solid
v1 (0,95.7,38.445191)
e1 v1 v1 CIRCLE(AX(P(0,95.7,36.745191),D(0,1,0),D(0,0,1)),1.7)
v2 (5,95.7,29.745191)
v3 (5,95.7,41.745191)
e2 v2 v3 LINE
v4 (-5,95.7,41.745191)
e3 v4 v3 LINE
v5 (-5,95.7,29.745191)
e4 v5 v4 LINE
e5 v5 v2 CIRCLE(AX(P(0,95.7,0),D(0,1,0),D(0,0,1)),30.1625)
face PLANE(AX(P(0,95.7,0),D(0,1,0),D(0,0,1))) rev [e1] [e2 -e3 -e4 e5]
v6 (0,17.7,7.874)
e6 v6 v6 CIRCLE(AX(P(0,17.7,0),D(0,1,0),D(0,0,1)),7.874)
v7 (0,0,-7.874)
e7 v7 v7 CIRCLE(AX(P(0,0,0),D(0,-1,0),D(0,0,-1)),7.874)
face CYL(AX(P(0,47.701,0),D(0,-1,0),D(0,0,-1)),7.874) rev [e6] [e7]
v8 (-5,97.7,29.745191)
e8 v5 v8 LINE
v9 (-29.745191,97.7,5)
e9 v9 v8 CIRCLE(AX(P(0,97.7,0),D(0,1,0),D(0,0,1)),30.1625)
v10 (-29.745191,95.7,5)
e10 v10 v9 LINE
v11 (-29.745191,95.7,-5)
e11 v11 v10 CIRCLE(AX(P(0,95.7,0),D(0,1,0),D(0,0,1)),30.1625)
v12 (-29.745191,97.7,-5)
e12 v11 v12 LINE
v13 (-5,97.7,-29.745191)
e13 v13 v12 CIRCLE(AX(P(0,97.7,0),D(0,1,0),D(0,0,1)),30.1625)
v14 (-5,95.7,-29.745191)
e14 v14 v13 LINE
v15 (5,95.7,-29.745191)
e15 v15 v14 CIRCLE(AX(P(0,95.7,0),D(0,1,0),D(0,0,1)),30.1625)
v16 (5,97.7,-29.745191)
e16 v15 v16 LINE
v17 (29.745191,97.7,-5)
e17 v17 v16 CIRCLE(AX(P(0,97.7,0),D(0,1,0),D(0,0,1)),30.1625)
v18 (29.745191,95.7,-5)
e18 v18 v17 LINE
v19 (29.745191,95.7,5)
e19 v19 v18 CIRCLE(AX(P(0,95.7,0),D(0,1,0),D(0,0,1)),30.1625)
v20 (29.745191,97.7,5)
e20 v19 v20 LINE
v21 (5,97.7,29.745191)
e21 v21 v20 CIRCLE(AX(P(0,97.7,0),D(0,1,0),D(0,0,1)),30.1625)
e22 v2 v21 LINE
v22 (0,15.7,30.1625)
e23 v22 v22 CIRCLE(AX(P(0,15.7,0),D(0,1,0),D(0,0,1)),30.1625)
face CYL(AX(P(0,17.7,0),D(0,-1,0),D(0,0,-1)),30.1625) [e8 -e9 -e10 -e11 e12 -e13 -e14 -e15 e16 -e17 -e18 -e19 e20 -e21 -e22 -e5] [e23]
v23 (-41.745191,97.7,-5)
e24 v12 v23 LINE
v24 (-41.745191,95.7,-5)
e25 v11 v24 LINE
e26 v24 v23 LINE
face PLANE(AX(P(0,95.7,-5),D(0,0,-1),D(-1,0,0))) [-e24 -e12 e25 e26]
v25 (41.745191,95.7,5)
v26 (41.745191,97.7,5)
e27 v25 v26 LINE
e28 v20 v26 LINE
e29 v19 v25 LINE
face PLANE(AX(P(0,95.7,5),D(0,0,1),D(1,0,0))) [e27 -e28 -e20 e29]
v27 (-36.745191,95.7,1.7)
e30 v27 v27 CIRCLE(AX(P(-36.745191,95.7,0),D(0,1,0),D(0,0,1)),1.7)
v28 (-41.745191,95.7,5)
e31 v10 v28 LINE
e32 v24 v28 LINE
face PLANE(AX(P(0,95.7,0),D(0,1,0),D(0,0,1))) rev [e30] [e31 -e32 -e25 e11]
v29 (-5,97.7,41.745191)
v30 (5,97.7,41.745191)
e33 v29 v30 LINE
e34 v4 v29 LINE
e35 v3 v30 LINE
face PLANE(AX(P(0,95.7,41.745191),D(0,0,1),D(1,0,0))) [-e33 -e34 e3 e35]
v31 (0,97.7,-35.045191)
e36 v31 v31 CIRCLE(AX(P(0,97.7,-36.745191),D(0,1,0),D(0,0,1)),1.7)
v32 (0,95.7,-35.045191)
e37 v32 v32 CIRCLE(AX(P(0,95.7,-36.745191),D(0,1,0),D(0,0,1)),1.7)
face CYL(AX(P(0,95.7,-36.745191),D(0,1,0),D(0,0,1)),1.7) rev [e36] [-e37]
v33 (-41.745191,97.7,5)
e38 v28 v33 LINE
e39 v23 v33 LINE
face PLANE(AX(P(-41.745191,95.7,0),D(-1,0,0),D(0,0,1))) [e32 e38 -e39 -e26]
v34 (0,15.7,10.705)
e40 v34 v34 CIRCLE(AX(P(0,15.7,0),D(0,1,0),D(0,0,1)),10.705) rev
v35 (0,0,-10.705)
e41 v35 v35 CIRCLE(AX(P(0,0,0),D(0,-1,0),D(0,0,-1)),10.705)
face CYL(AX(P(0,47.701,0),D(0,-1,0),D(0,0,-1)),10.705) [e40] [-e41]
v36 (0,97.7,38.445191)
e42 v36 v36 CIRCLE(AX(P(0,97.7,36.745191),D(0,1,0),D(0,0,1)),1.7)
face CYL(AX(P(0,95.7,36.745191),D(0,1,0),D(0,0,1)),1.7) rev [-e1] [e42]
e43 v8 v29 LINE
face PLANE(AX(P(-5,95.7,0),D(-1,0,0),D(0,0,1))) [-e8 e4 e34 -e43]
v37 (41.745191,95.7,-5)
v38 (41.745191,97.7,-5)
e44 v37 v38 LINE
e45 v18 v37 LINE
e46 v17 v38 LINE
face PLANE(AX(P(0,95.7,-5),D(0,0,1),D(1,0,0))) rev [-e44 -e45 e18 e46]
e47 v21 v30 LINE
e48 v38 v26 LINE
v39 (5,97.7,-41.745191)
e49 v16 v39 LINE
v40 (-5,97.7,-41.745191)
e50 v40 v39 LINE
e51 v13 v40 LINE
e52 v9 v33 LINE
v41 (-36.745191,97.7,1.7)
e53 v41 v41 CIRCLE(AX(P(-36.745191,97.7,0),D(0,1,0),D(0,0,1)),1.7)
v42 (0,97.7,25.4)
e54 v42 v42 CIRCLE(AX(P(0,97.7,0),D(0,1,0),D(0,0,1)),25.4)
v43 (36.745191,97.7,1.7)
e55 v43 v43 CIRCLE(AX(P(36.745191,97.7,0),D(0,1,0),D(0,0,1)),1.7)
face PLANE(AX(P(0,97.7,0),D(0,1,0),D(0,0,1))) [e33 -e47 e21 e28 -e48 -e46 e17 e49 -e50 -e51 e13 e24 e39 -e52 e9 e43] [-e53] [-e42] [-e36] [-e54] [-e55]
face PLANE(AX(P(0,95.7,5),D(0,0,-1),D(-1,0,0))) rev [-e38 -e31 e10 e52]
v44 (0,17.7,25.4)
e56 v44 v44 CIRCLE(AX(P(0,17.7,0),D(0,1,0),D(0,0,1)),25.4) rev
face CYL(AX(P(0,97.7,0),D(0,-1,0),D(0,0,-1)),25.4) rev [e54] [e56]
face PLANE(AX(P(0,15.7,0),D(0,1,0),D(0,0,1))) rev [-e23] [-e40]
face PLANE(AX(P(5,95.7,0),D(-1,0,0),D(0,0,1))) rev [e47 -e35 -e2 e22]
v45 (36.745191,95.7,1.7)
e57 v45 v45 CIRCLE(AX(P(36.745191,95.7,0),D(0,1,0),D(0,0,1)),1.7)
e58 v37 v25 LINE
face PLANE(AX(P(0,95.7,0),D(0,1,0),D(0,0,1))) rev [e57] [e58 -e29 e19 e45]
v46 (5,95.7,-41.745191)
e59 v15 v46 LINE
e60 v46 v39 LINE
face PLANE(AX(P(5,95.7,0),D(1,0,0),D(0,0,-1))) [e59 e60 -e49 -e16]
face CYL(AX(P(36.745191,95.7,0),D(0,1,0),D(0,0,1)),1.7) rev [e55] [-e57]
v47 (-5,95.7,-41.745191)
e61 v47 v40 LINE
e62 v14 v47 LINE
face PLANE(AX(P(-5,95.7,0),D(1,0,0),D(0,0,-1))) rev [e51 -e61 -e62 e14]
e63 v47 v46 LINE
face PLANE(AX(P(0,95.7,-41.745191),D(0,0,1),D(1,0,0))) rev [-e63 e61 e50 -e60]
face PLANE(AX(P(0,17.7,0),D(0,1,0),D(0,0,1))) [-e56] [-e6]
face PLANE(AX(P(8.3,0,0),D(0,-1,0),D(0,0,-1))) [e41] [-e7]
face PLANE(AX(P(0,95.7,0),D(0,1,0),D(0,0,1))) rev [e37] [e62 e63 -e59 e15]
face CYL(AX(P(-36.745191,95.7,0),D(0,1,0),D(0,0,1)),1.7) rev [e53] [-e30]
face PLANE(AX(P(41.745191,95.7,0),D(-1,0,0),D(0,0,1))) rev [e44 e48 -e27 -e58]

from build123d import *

# Parameters (mm, degrees)
SKETCH5_OUTSIDE_W   = 34.468
SKETCH5_OUTSIDE_H   = 34.468
CUT_EXTRUDE1_DEPTH  = 7.2
BOSS_EXTRUDE1_REACH = 51.718
SKETCH10_R          = 10.705
SKETCH10_R_2        = 6.9
BOSS_EXTRUDE3_REACH = 31.655
SKETCH12_R          = 8.3
CUT_EXTRUDE3_REACH  = 53.775
SKETCH13_R          = 3.45
SKETCH14_R          = 23.979548074
CUT_EXTRUDE5_DEPTH  = 32
BOSS_EXTRUDE4_START = 2
SKETCH16_R          = 30.1625
SKETCH16_R_2        = 7.874
BOSS_EXTRUDE4_DEPTH = 2
BOSS_EXTRUDE5_START = 80
SKETCH17_R          = 30.1625
SKETCH17_R_2        = 25.4
BOSS_EXTRUDE5_DEPTH = 80
SKETCH18_R          = 1.7
BOSS_EXTRUDE6_DEPTH = 2


# Read off the part's stored shape, not the designer's step: Cut-Extrude2
with BuildPart() as part:
    # Sketch1 → Revolve1 (revolve)
    with BuildSketch(Plane.XY, mode=Mode.PRIVATE) as revolve1_sk:
        Polygon((3.25, 47.7), (4.8, 47.7), (5.2, 43.217813034), (4.8, 42.533333333), (5.2, 38.051146367), (4.8, 37.366666667), (5.2, 32.8844797), (4.8, 32.2), (5.25, 26.2), (5.25, 22.2), (10.6, 22.2), (10.6, 15), (8.3, 15), (8.3, 0), (5.5, 0), (5.5, 18), (3.25, 19.7), align=None)
    revolve(revolve1_sk.sketch.rotate(Axis((0, 0, 0), (0, 1, 0)), 90), axis=Axis((0, 0, 0), (0, 1, 0)))

    # Sketch5 outside → Cut-Extrude1 (cut)
    with BuildSketch(Plane(origin=(0, 22.2, 0), x_dir=(1, 0, 0), z_dir=(0, 1, 0))):
        Rectangle(SKETCH5_OUTSIDE_W, SKETCH5_OUTSIDE_H)
        Polygon((-5.3, 9.17986928), (5.3, 9.17986928), (10.6, 0), (5.3, -9.17986928), (-5.3, -9.17986928), (-10.6, 0), align=None, mode=Mode.SUBTRACT)
    extrude(amount=-CUT_EXTRUDE1_DEPTH, mode=Mode.SUBTRACT)

    # Sketch4 → Cut-Revolve1 (revolve, cut)
    with BuildSketch(Plane.XY, mode=Mode.PRIVATE) as cut_revolve1_sk:
        Polygon((6.9, 0), (8.3, 1.4), (8.3, 0), align=None)
        Polygon((8.3, 15), (10.6, 15.837131539), (10.6, 15), align=None)
        Polygon((8.3, 22.2), (10.6, 21.362868461), (10.6, 22.2), align=None)
    revolve(cut_revolve1_sk.sketch.rotate(Axis((0, 0, 0), (0, 1, 0)), 90), axis=Axis((0, 0, 0), (0, 1, 0)), mode=Mode.SUBTRACT)

    # Boss-Extrude1: up to this cone (the profile starts outside it)
    boss_extrude1_end = Plane(origin=(0, 0, 0), z_dir=(0, 1, 0)).offset(11.979048056) * Cone(2.747e-06, 110.555614597, 40.238951944, align=(Align.CENTER, Align.CENTER, Align.MIN), mode=Mode.PRIVATE)
    # Sketch10 → Boss-Extrude1 (add, up to the surface)
    with BuildSketch(Plane.XZ, mode=Mode.PRIVATE) as boss_extrude1_sk1:
        with Locations(Location((0, 0, 0), (0, 0, 270))):
            Circle(SKETCH10_R)
        Circle(SKETCH10_R_2, mode=Mode.SUBTRACT)
    boss_extrude1_tool1 = extrude(boss_extrude1_sk1.sketch, amount=-BOSS_EXTRUDE1_REACH, mode=Mode.PRIVATE) - boss_extrude1_end
    add(boss_extrude1_tool1.solids().sort_by_distance((0, 0, 10.402217))[0])

    # Cut-Extrude2 outline → Cut-Extrude2 (revolve, cut)
    with BuildSketch(Plane.XY):
        Polygon((7.874, 16.206311111), (5.5, 18), (5.5, 0), (7.874, 0), align=None)
    revolve(axis=Axis((0, 0, 0), (0, 1, 0)), mode=Mode.SUBTRACT)

    # Boss-Extrude3: up to this cone (the profile starts inside it)
    boss_extrude3_end = Plane(origin=(0, 22.2, 0), z_dir=(0, 1, 0)).offset(-10.220951944) * Cone(2.747e-06, 193.581188051, 70.457789364, align=(Align.CENTER, Align.CENTER, Align.MIN), mode=Mode.PRIVATE)
    # Sketch12 → Boss-Extrude3 (add, up to the surface)
    with BuildSketch(Plane(origin=(0, 22.2, 0), x_dir=(1, 0, 0), z_dir=(0, 1, 0)), mode=Mode.PRIVATE) as boss_extrude3_sk1:
        Polygon((-7.609401077, 13.17986928), (-15.218802154, 0), (-7.609401077, -13.17986928), (7.609401077, -13.17986928), (15.218802154, 0), (7.609401077, 13.17986928), align=None)
        Circle(SKETCH12_R, mode=Mode.SUBTRACT)
    boss_extrude3_tool1 = extrude(boss_extrude3_sk1.sketch, amount=-BOSS_EXTRUDE3_REACH, mode=Mode.PRIVATE) & boss_extrude3_end
    add(boss_extrude3_tool1.solids().sort_by_distance((-11.065395, 22.2, -6.388609))[0])

    # Cut-Extrude3: up to this cone (the profile starts outside it)
    cut_extrude3_end = Plane(origin=(0, 47.7, 0), z_dir=(0, -1, 0)).offset(25.544445444) * Cone(1.324e-06, 38.025735294, 28.730554556, align=(Align.CENTER, Align.CENTER, Align.MIN), mode=Mode.PRIVATE)
    # Sketch13 → Cut-Extrude3 (cut, up to the surface)
    with BuildSketch(Plane(origin=(0, 47.7, 0), x_dir=(1, 0, 0), z_dir=(0, 1, 0)), mode=Mode.PRIVATE) as cut_extrude3_sk1:
        with Locations(Location((0, 0, 0), (0, 0, 270))):
            Circle(SKETCH13_R)
    cut_extrude3_tool1 = extrude(cut_extrude3_sk1.sketch, amount=-CUT_EXTRUDE3_REACH, mode=Mode.PRIVATE) - cut_extrude3_end
    add(cut_extrude3_tool1.solids().sort_by_distance((0, 47.7, 0))[0], mode=Mode.SUBTRACT)

    # Sketch14 → Cut-Extrude5 (cut)
    with BuildSketch(Plane(origin=(0, 47.7, 0), x_dir=(1, 0, 0), z_dir=(0, 1, 0))):
        Circle(SKETCH14_R)
    extrude(amount=-CUT_EXTRUDE5_DEPTH, mode=Mode.SUBTRACT)

    # Sketch16 → Boss-Extrude4 (add)
    with BuildSketch(Plane(origin=(0, 15.7, 0), x_dir=(1, 0, 0), z_dir=(0, 1, 0)).offset(BOSS_EXTRUDE4_START)):
        with Locations(Location((0, 0, 0), (0, 0, 270))):
            Circle(SKETCH16_R)
        with Locations(Location((0, 0, 0), (0, 0, 90))):
            Circle(SKETCH16_R_2, mode=Mode.SUBTRACT)
    extrude(amount=-BOSS_EXTRUDE4_DEPTH)

    # Sketch17 → Boss-Extrude5 (add)
    with BuildSketch(Plane(origin=(0, 17.7, 0), x_dir=(1, 0, 0), z_dir=(0, 1, 0)).offset(BOSS_EXTRUDE5_START)):
        with Locations(Location((0, 0, 0), (0, 0, 270))):
            Circle(SKETCH17_R)
        with Locations(Location((0, 0, 0), (0, 0, 270))):
            Circle(SKETCH17_R_2, mode=Mode.SUBTRACT)
    extrude(amount=-BOSS_EXTRUDE5_DEPTH)

    # Sketch18 → Boss-Extrude6 (add)
    # profile 1 of 8: a face of its own
    with BuildSketch(Plane(origin=(0, 97.7, 0), x_dir=(1, 0, 0), z_dir=(0, 1, 0))):
        with BuildLine():
            ThreePointArc((-29.745191313, -5), (-30.1625, 0), (-29.745191313, 5))
            Line((-29.745191313, 5), (-41.745191313, 5))
            Line((-41.745191313, 5), (-41.745191313, -5))
            Line((-41.745191313, -5), (-29.745191313, -5))
        make_face()
        with Locations(Location((-36.745191313, 0, 0), (0, 0, 270))):
            Circle(SKETCH18_R, mode=Mode.SUBTRACT)
    # profile 2 of 8: a face of its own
    with BuildSketch(Plane(origin=(0, 97.7, 0), x_dir=(1, 0, 0), z_dir=(0, 1, 0))):
        with BuildLine():
            Line((-29.745191313, -5), (-29.745191313, 5))
            ThreePointArc((-29.745191313, 5), (-30.1625, 0), (-29.745191313, -5))
        make_face()
    # profile 3 of 8: a face of its own
    with BuildSketch(Plane(origin=(0, 97.7, 0), x_dir=(1, 0, 0), z_dir=(0, 1, 0))):
        with BuildLine():
            ThreePointArc((29.745191313, -5), (30.1625, 0), (29.745191313, 5))
            Line((29.745191313, 5), (29.745191313, -5))
        make_face()
    # profile 4 of 8: a face of its own
    with BuildSketch(Plane(origin=(0, 97.7, 0), x_dir=(1, 0, 0), z_dir=(0, 1, 0))):
        with BuildLine():
            Line((41.745191313, 5), (29.745191313, 5))
            ThreePointArc((29.745191313, 5), (30.1625, 0), (29.745191313, -5))
            Line((29.745191313, -5), (41.745191313, -5))
            Line((41.745191313, -5), (41.745191313, 5))
        make_face()
        with Locations(Location((36.745191313, 0, 0), (0, 0, 270))):
            Circle(SKETCH18_R, mode=Mode.SUBTRACT)
    # profile 5 of 8: a face of its own
    with BuildSketch(Plane(origin=(0, 97.7, 0), x_dir=(1, 0, 0), z_dir=(0, 1, 0))):
        with BuildLine():
            ThreePointArc((5, -29.745191313), (0, -30.1625), (-5, -29.745191313))
            Line((-5, -29.745191313), (-5, -41.745191313))
            Line((-5, -41.745191313), (5, -41.745191313))
            Line((5, -41.745191313), (5, -29.745191313))
        make_face()
        with Locations(Location((0, -36.745191313, 0), (0, 0, 270))):
            Circle(SKETCH18_R, mode=Mode.SUBTRACT)
    # profile 6 of 8: a face of its own
    with BuildSketch(Plane(origin=(0, 97.7, 0), x_dir=(1, 0, 0), z_dir=(0, 1, 0))):
        with BuildLine():
            Line((5, -29.745191313), (-5, -29.745191313))
            ThreePointArc((-5, -29.745191313), (0, -30.1625), (5, -29.745191313))
        make_face()
    # profile 7 of 8: a face of its own
    with BuildSketch(Plane(origin=(0, 97.7, 0), x_dir=(1, 0, 0), z_dir=(0, 1, 0))):
        with BuildLine():
            ThreePointArc((5, 29.745191313), (0, 30.1625), (-5, 29.745191313))
            Line((-5, 29.745191313), (5, 29.745191313))
        make_face()
    # profile 8 of 8: a face of its own
    with BuildSketch(Plane(origin=(0, 97.7, 0), x_dir=(1, 0, 0), z_dir=(0, 1, 0))):
        with BuildLine():
            Line((-5, 41.745191313), (-5, 29.745191313))
            ThreePointArc((-5, 29.745191313), (0, 30.1625), (5, 29.745191313))
            Line((5, 29.745191313), (5, 41.745191313))
            Line((5, 41.745191313), (-5, 41.745191313))
        make_face()
        with Locations(Location((0, 36.745191313, 0), (0, 0, 270))):
            Circle(SKETCH18_R, mode=Mode.SUBTRACT)
    extrude(amount=-BOSS_EXTRUDE6_DEPTH)


solid = part.part
